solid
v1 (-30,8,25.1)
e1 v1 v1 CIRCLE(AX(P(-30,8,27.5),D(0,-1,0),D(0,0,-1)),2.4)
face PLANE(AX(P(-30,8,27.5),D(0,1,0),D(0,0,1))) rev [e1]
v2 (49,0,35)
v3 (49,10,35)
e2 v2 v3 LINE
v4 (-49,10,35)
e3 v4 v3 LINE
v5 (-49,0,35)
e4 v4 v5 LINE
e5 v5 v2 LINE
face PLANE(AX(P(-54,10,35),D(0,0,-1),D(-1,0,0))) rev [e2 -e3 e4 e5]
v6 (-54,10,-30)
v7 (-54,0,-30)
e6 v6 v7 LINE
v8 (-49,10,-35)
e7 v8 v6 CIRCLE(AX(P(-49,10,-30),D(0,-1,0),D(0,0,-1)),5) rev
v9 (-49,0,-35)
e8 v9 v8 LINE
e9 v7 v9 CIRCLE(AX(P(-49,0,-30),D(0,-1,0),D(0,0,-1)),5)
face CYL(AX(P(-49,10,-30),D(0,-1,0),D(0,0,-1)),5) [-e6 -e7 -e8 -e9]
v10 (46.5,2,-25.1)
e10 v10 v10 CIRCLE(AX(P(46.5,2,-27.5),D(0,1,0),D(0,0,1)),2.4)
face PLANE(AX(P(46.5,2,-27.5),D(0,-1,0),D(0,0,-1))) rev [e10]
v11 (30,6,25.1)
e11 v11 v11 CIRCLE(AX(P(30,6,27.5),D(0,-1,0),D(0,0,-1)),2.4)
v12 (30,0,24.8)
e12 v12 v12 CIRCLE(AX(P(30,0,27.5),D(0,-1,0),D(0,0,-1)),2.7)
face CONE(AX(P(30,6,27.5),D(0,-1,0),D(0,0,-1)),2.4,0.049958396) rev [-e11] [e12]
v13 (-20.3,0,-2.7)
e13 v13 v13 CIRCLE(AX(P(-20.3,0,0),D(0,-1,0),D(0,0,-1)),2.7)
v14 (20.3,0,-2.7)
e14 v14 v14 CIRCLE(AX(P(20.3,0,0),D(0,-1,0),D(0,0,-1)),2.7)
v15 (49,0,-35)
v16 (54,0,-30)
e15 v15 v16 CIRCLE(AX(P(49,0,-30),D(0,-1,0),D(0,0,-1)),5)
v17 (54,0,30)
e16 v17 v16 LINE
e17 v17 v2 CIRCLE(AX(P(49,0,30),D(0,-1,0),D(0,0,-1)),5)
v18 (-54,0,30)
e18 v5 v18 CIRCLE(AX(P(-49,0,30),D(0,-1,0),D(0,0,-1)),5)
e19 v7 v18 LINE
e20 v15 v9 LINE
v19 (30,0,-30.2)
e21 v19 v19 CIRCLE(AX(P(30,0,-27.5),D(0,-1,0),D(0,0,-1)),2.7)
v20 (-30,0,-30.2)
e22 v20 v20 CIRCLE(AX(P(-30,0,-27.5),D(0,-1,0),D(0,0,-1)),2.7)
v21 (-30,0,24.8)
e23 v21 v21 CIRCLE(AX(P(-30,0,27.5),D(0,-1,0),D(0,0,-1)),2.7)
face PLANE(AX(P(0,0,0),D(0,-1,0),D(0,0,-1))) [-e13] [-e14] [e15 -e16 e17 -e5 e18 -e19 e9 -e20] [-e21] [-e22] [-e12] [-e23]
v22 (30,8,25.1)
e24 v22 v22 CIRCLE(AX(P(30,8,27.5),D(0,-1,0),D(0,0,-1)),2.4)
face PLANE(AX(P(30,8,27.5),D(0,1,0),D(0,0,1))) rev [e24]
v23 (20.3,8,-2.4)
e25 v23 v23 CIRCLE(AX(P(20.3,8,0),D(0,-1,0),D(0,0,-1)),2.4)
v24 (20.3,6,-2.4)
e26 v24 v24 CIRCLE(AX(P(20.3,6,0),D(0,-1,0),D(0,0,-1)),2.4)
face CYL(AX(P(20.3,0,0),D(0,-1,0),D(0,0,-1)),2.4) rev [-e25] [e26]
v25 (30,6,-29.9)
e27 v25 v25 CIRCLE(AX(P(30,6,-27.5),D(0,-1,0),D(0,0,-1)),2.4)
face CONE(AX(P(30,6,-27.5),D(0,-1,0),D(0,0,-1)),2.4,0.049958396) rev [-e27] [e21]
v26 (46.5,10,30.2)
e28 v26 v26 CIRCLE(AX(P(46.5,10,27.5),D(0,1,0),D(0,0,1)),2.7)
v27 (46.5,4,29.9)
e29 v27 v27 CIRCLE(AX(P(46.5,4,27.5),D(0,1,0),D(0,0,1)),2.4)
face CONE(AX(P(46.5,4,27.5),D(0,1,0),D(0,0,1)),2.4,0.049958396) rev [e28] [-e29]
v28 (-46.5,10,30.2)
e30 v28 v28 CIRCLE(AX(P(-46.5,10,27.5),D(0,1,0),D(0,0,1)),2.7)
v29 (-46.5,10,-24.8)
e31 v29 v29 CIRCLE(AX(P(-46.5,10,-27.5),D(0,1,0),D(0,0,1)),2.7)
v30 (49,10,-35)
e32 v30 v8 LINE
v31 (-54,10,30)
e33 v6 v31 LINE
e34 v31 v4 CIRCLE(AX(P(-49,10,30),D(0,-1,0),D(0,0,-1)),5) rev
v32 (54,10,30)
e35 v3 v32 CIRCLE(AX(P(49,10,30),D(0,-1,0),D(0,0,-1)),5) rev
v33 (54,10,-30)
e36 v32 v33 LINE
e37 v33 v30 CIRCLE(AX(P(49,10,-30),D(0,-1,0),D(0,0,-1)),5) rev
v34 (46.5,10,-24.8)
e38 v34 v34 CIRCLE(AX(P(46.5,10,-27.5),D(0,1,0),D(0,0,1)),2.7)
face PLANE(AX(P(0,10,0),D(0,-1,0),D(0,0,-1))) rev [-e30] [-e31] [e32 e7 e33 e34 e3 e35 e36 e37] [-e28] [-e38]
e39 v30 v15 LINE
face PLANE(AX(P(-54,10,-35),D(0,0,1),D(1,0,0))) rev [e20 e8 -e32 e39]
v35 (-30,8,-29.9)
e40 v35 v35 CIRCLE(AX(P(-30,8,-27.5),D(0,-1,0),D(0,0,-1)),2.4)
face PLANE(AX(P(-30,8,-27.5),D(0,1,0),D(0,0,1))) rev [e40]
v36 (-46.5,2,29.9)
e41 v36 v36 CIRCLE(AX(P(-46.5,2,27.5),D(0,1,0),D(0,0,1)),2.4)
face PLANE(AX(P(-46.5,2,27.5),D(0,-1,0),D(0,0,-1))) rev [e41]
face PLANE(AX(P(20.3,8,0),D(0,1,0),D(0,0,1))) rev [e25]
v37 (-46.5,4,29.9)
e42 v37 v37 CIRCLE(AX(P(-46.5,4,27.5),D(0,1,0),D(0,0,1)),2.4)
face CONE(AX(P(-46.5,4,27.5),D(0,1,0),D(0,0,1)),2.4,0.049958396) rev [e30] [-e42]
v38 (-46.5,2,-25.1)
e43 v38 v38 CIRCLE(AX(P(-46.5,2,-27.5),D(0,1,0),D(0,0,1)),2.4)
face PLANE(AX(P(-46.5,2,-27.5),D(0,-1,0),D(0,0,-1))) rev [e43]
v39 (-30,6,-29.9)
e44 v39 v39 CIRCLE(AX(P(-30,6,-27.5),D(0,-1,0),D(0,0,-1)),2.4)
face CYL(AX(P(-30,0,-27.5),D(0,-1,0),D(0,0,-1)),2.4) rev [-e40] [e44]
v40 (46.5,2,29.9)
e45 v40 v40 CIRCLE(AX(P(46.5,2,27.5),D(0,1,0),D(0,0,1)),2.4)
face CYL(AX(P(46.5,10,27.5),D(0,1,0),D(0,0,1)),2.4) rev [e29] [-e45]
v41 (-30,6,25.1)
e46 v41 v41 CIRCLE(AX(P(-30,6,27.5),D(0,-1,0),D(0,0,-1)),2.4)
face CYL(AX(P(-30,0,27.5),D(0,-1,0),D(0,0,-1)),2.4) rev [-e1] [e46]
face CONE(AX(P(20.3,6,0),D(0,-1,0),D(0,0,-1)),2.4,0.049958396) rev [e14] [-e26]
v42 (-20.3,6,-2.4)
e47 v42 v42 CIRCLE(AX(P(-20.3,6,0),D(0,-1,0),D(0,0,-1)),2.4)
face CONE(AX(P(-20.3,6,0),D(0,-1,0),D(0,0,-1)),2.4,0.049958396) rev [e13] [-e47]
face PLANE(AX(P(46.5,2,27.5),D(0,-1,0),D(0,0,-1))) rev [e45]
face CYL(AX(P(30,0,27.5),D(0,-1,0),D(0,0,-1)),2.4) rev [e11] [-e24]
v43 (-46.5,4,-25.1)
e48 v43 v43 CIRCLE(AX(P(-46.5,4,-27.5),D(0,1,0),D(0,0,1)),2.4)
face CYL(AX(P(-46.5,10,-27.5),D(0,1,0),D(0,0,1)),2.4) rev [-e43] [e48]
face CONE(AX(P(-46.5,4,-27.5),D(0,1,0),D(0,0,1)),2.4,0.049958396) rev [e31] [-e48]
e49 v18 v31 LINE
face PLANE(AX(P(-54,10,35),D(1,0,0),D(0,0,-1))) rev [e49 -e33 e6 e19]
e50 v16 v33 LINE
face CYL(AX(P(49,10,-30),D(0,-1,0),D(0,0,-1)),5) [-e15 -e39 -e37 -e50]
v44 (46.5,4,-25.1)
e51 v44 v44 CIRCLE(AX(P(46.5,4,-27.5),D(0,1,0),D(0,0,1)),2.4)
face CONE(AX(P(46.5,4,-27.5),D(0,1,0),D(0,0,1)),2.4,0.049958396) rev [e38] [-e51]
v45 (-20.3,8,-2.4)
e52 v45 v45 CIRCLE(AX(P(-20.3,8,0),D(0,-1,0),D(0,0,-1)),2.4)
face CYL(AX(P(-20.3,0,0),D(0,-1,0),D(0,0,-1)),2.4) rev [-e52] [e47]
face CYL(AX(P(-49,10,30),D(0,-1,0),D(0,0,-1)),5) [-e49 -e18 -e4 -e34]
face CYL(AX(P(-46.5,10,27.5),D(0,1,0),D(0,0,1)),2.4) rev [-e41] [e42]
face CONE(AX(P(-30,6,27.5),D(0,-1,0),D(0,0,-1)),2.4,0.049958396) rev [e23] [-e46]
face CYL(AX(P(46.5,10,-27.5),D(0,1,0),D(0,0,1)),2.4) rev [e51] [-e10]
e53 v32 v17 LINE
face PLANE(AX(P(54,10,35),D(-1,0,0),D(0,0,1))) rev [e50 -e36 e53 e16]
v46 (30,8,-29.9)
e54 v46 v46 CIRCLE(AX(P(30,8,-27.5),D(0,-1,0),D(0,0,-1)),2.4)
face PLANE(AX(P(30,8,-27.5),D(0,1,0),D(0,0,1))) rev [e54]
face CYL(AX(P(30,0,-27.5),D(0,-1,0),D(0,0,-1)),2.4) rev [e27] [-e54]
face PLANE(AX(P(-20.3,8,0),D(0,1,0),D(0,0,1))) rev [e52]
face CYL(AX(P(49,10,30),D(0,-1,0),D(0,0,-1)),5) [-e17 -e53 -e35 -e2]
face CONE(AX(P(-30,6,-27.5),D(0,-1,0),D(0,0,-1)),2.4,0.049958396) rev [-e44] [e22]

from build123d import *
from OCP.BRepFilletAPI import BRepFilletAPI_MakeChamfer

# Parameters (mm, degrees)
SKETCH1_W           = 108
SKETCH1_H           = 70
BOSS_EXTRUDE1_DEPTH = 10
HOLE1_D             = 4.8
HOLE1_DEPTH         = 8
HOLE1_CBORE_D       = 5.4
HOLE1_CBORE_DEPTH   = 6
FILLET1_R           = 5
HOLE3_D             = 4.8
HOLE3_DEPTH         = 8
HOLE3_CBORE_D       = 5.4
HOLE3_CBORE_DEPTH   = 6
CHAMFER1_SIZE       = 6
CHAMFER1_SIZE_2     = 0.3


with BuildPart() as part:
    # Sketch1 → Boss-Extrude1 (new body)
    with BuildSketch(Plane(origin=(0, 0, 0), x_dir=(1, 0, 0), z_dir=(0, 1, 0))):
        Rectangle(SKETCH1_W, SKETCH1_H)
    extrude(amount=BOSS_EXTRUDE1_DEPTH)

    # Hole1
    with Locations(Plane(origin=(0, 10, 0), x_dir=(1, 0, 0), z_dir=(0, 1, 0))):
        with Locations((46.5, 27.5), (-46.5, 27.5), (-46.5, -27.5), (46.5, -27.5)):
            CounterBoreHole(HOLE1_D / 2, HOLE1_CBORE_D / 2, HOLE1_CBORE_DEPTH, depth=HOLE1_DEPTH)

    # Fillet1
    fillet1_edges = [part.edges().sort_by_distance(p)[0] for p in [
        (54, 5, 35),
        (-54, 5, 35),
        (-54, 5, -35),
        (54, 5, -35),
    ]]
    fillet(fillet1_edges, radius=FILLET1_R)

    # Hole3
    with Locations(Plane(origin=(0, 0, 0), x_dir=(-1, 0, 0), z_dir=(0, -1, 0))):
        with Locations((-20.3, 0), (20.3, 0), (-30, 27.5), (30, 27.5), (30, -27.5), (-30, -27.5)):
            CounterBoreHole(HOLE3_D / 2, HOLE3_CBORE_D / 2, HOLE3_CBORE_DEPTH, depth=HOLE3_DEPTH)

    # Chamfer1
    chamfer1_edges_1 = [part.edges().sort_by_distance(p)[0] for p in [
        (43.8, 4, 27.5),
    ]]
    chamfer1_side_1 = [part.faces().sort_by_distance(p)[0] for p in [
        (43.8, 4.006, 27.5),
    ]]
    chamfer1_edges_2 = [part.edges().sort_by_distance(p)[0] for p in [
        (-49.2, 4, 27.5),
    ]]
    chamfer1_side_2 = [part.faces().sort_by_distance(p)[0] for p in [
        (-49.2, 4.006, 27.5),
    ]]
    chamfer1_edges_3 = [part.edges().sort_by_distance(p)[0] for p in [
        (-49.2, 4, -27.5),
    ]]
    chamfer1_side_3 = [part.faces().sort_by_distance(p)[0] for p in [
        (-49.2, 4.006, -27.5),
    ]]
    chamfer1_edges_4 = [part.edges().sort_by_distance(p)[0] for p in [
        (43.8, 4, -27.5),
    ]]
    chamfer1_side_4 = [part.faces().sort_by_distance(p)[0] for p in [
        (43.8, 4.006, -27.5),
    ]]
    chamfer1_edges_5 = [part.edges().sort_by_distance(p)[0] for p in [
        (32.7, 6, 27.5),
    ]]
    chamfer1_side_5 = [part.faces().sort_by_distance(p)[0] for p in [
        (32.7, 5.994, 27.5),
    ]]
    chamfer1_edges_6 = [part.edges().sort_by_distance(p)[0] for p in [
        (-27.3, 6, 27.5),
    ]]
    chamfer1_side_6 = [part.faces().sort_by_distance(p)[0] for p in [
        (-27.3, 5.994, 27.5),
    ]]
    chamfer1_edges_7 = [part.edges().sort_by_distance(p)[0] for p in [
        (-27.3, 6, -27.5),
    ]]
    chamfer1_side_7 = [part.faces().sort_by_distance(p)[0] for p in [
        (-27.3, 5.994, -27.5),
    ]]
    chamfer1_edges_8 = [part.edges().sort_by_distance(p)[0] for p in [
        (32.7, 6, -27.5),
    ]]
    chamfer1_side_8 = [part.faces().sort_by_distance(p)[0] for p in [
        (32.7, 5.994, -27.5),
    ]]
    chamfer1_edges_9 = [part.edges().sort_by_distance(p)[0] for p in [
        (-17.6, 6, 0),
    ]]
    chamfer1_side_9 = [part.faces().sort_by_distance(p)[0] for p in [
        (-17.6, 5.994, 0),
    ]]
    chamfer1_edges_10 = [part.edges().sort_by_distance(p)[0] for p in [
        (23, 6, 0),
    ]]
    chamfer1_side_10 = [part.faces().sort_by_distance(p)[0] for p in [
        (23, 5.994, 0),
    ]]
    chamfer1 = BRepFilletAPI_MakeChamfer(part.part.solid().wrapped)
    for e in chamfer1_edges_1:
        chamfer1.Add(CHAMFER1_SIZE - 0.0001, CHAMFER1_SIZE_2 - 0.0001, e.wrapped, chamfer1_side_1[0].wrapped)
    for e in chamfer1_edges_2:
        chamfer1.Add(CHAMFER1_SIZE - 0.0001, CHAMFER1_SIZE_2 - 0.0001, e.wrapped, chamfer1_side_2[0].wrapped)
    for e in chamfer1_edges_3:
        chamfer1.Add(CHAMFER1_SIZE - 0.0001, CHAMFER1_SIZE_2 - 0.0001, e.wrapped, chamfer1_side_3[0].wrapped)
    for e in chamfer1_edges_4:
        chamfer1.Add(CHAMFER1_SIZE - 0.0001, CHAMFER1_SIZE_2 - 0.0001, e.wrapped, chamfer1_side_4[0].wrapped)
    for e in chamfer1_edges_5:
        chamfer1.Add(CHAMFER1_SIZE - 0.0001, CHAMFER1_SIZE_2 - 0.0001, e.wrapped, chamfer1_side_5[0].wrapped)
    for e in chamfer1_edges_6:
        chamfer1.Add(CHAMFER1_SIZE - 0.0001, CHAMFER1_SIZE_2 - 0.0001, e.wrapped, chamfer1_side_6[0].wrapped)
    for e in chamfer1_edges_7:
        chamfer1.Add(CHAMFER1_SIZE - 0.0001, CHAMFER1_SIZE_2 - 0.0001, e.wrapped, chamfer1_side_7[0].wrapped)
    for e in chamfer1_edges_8:
        chamfer1.Add(CHAMFER1_SIZE - 0.0001, CHAMFER1_SIZE_2 - 0.0001, e.wrapped, chamfer1_side_8[0].wrapped)
    for e in chamfer1_edges_9:
        chamfer1.Add(CHAMFER1_SIZE - 0.0001, CHAMFER1_SIZE_2 - 0.0001, e.wrapped, chamfer1_side_9[0].wrapped)
    for e in chamfer1_edges_10:
        chamfer1.Add(CHAMFER1_SIZE - 0.0001, CHAMFER1_SIZE_2 - 0.0001, e.wrapped, chamfer1_side_10[0].wrapped)
    add(Compound.cast(chamfer1.Shape()), mode=Mode.REPLACE)  # a hair under: the kernel refuses the full size


solid = part.part
